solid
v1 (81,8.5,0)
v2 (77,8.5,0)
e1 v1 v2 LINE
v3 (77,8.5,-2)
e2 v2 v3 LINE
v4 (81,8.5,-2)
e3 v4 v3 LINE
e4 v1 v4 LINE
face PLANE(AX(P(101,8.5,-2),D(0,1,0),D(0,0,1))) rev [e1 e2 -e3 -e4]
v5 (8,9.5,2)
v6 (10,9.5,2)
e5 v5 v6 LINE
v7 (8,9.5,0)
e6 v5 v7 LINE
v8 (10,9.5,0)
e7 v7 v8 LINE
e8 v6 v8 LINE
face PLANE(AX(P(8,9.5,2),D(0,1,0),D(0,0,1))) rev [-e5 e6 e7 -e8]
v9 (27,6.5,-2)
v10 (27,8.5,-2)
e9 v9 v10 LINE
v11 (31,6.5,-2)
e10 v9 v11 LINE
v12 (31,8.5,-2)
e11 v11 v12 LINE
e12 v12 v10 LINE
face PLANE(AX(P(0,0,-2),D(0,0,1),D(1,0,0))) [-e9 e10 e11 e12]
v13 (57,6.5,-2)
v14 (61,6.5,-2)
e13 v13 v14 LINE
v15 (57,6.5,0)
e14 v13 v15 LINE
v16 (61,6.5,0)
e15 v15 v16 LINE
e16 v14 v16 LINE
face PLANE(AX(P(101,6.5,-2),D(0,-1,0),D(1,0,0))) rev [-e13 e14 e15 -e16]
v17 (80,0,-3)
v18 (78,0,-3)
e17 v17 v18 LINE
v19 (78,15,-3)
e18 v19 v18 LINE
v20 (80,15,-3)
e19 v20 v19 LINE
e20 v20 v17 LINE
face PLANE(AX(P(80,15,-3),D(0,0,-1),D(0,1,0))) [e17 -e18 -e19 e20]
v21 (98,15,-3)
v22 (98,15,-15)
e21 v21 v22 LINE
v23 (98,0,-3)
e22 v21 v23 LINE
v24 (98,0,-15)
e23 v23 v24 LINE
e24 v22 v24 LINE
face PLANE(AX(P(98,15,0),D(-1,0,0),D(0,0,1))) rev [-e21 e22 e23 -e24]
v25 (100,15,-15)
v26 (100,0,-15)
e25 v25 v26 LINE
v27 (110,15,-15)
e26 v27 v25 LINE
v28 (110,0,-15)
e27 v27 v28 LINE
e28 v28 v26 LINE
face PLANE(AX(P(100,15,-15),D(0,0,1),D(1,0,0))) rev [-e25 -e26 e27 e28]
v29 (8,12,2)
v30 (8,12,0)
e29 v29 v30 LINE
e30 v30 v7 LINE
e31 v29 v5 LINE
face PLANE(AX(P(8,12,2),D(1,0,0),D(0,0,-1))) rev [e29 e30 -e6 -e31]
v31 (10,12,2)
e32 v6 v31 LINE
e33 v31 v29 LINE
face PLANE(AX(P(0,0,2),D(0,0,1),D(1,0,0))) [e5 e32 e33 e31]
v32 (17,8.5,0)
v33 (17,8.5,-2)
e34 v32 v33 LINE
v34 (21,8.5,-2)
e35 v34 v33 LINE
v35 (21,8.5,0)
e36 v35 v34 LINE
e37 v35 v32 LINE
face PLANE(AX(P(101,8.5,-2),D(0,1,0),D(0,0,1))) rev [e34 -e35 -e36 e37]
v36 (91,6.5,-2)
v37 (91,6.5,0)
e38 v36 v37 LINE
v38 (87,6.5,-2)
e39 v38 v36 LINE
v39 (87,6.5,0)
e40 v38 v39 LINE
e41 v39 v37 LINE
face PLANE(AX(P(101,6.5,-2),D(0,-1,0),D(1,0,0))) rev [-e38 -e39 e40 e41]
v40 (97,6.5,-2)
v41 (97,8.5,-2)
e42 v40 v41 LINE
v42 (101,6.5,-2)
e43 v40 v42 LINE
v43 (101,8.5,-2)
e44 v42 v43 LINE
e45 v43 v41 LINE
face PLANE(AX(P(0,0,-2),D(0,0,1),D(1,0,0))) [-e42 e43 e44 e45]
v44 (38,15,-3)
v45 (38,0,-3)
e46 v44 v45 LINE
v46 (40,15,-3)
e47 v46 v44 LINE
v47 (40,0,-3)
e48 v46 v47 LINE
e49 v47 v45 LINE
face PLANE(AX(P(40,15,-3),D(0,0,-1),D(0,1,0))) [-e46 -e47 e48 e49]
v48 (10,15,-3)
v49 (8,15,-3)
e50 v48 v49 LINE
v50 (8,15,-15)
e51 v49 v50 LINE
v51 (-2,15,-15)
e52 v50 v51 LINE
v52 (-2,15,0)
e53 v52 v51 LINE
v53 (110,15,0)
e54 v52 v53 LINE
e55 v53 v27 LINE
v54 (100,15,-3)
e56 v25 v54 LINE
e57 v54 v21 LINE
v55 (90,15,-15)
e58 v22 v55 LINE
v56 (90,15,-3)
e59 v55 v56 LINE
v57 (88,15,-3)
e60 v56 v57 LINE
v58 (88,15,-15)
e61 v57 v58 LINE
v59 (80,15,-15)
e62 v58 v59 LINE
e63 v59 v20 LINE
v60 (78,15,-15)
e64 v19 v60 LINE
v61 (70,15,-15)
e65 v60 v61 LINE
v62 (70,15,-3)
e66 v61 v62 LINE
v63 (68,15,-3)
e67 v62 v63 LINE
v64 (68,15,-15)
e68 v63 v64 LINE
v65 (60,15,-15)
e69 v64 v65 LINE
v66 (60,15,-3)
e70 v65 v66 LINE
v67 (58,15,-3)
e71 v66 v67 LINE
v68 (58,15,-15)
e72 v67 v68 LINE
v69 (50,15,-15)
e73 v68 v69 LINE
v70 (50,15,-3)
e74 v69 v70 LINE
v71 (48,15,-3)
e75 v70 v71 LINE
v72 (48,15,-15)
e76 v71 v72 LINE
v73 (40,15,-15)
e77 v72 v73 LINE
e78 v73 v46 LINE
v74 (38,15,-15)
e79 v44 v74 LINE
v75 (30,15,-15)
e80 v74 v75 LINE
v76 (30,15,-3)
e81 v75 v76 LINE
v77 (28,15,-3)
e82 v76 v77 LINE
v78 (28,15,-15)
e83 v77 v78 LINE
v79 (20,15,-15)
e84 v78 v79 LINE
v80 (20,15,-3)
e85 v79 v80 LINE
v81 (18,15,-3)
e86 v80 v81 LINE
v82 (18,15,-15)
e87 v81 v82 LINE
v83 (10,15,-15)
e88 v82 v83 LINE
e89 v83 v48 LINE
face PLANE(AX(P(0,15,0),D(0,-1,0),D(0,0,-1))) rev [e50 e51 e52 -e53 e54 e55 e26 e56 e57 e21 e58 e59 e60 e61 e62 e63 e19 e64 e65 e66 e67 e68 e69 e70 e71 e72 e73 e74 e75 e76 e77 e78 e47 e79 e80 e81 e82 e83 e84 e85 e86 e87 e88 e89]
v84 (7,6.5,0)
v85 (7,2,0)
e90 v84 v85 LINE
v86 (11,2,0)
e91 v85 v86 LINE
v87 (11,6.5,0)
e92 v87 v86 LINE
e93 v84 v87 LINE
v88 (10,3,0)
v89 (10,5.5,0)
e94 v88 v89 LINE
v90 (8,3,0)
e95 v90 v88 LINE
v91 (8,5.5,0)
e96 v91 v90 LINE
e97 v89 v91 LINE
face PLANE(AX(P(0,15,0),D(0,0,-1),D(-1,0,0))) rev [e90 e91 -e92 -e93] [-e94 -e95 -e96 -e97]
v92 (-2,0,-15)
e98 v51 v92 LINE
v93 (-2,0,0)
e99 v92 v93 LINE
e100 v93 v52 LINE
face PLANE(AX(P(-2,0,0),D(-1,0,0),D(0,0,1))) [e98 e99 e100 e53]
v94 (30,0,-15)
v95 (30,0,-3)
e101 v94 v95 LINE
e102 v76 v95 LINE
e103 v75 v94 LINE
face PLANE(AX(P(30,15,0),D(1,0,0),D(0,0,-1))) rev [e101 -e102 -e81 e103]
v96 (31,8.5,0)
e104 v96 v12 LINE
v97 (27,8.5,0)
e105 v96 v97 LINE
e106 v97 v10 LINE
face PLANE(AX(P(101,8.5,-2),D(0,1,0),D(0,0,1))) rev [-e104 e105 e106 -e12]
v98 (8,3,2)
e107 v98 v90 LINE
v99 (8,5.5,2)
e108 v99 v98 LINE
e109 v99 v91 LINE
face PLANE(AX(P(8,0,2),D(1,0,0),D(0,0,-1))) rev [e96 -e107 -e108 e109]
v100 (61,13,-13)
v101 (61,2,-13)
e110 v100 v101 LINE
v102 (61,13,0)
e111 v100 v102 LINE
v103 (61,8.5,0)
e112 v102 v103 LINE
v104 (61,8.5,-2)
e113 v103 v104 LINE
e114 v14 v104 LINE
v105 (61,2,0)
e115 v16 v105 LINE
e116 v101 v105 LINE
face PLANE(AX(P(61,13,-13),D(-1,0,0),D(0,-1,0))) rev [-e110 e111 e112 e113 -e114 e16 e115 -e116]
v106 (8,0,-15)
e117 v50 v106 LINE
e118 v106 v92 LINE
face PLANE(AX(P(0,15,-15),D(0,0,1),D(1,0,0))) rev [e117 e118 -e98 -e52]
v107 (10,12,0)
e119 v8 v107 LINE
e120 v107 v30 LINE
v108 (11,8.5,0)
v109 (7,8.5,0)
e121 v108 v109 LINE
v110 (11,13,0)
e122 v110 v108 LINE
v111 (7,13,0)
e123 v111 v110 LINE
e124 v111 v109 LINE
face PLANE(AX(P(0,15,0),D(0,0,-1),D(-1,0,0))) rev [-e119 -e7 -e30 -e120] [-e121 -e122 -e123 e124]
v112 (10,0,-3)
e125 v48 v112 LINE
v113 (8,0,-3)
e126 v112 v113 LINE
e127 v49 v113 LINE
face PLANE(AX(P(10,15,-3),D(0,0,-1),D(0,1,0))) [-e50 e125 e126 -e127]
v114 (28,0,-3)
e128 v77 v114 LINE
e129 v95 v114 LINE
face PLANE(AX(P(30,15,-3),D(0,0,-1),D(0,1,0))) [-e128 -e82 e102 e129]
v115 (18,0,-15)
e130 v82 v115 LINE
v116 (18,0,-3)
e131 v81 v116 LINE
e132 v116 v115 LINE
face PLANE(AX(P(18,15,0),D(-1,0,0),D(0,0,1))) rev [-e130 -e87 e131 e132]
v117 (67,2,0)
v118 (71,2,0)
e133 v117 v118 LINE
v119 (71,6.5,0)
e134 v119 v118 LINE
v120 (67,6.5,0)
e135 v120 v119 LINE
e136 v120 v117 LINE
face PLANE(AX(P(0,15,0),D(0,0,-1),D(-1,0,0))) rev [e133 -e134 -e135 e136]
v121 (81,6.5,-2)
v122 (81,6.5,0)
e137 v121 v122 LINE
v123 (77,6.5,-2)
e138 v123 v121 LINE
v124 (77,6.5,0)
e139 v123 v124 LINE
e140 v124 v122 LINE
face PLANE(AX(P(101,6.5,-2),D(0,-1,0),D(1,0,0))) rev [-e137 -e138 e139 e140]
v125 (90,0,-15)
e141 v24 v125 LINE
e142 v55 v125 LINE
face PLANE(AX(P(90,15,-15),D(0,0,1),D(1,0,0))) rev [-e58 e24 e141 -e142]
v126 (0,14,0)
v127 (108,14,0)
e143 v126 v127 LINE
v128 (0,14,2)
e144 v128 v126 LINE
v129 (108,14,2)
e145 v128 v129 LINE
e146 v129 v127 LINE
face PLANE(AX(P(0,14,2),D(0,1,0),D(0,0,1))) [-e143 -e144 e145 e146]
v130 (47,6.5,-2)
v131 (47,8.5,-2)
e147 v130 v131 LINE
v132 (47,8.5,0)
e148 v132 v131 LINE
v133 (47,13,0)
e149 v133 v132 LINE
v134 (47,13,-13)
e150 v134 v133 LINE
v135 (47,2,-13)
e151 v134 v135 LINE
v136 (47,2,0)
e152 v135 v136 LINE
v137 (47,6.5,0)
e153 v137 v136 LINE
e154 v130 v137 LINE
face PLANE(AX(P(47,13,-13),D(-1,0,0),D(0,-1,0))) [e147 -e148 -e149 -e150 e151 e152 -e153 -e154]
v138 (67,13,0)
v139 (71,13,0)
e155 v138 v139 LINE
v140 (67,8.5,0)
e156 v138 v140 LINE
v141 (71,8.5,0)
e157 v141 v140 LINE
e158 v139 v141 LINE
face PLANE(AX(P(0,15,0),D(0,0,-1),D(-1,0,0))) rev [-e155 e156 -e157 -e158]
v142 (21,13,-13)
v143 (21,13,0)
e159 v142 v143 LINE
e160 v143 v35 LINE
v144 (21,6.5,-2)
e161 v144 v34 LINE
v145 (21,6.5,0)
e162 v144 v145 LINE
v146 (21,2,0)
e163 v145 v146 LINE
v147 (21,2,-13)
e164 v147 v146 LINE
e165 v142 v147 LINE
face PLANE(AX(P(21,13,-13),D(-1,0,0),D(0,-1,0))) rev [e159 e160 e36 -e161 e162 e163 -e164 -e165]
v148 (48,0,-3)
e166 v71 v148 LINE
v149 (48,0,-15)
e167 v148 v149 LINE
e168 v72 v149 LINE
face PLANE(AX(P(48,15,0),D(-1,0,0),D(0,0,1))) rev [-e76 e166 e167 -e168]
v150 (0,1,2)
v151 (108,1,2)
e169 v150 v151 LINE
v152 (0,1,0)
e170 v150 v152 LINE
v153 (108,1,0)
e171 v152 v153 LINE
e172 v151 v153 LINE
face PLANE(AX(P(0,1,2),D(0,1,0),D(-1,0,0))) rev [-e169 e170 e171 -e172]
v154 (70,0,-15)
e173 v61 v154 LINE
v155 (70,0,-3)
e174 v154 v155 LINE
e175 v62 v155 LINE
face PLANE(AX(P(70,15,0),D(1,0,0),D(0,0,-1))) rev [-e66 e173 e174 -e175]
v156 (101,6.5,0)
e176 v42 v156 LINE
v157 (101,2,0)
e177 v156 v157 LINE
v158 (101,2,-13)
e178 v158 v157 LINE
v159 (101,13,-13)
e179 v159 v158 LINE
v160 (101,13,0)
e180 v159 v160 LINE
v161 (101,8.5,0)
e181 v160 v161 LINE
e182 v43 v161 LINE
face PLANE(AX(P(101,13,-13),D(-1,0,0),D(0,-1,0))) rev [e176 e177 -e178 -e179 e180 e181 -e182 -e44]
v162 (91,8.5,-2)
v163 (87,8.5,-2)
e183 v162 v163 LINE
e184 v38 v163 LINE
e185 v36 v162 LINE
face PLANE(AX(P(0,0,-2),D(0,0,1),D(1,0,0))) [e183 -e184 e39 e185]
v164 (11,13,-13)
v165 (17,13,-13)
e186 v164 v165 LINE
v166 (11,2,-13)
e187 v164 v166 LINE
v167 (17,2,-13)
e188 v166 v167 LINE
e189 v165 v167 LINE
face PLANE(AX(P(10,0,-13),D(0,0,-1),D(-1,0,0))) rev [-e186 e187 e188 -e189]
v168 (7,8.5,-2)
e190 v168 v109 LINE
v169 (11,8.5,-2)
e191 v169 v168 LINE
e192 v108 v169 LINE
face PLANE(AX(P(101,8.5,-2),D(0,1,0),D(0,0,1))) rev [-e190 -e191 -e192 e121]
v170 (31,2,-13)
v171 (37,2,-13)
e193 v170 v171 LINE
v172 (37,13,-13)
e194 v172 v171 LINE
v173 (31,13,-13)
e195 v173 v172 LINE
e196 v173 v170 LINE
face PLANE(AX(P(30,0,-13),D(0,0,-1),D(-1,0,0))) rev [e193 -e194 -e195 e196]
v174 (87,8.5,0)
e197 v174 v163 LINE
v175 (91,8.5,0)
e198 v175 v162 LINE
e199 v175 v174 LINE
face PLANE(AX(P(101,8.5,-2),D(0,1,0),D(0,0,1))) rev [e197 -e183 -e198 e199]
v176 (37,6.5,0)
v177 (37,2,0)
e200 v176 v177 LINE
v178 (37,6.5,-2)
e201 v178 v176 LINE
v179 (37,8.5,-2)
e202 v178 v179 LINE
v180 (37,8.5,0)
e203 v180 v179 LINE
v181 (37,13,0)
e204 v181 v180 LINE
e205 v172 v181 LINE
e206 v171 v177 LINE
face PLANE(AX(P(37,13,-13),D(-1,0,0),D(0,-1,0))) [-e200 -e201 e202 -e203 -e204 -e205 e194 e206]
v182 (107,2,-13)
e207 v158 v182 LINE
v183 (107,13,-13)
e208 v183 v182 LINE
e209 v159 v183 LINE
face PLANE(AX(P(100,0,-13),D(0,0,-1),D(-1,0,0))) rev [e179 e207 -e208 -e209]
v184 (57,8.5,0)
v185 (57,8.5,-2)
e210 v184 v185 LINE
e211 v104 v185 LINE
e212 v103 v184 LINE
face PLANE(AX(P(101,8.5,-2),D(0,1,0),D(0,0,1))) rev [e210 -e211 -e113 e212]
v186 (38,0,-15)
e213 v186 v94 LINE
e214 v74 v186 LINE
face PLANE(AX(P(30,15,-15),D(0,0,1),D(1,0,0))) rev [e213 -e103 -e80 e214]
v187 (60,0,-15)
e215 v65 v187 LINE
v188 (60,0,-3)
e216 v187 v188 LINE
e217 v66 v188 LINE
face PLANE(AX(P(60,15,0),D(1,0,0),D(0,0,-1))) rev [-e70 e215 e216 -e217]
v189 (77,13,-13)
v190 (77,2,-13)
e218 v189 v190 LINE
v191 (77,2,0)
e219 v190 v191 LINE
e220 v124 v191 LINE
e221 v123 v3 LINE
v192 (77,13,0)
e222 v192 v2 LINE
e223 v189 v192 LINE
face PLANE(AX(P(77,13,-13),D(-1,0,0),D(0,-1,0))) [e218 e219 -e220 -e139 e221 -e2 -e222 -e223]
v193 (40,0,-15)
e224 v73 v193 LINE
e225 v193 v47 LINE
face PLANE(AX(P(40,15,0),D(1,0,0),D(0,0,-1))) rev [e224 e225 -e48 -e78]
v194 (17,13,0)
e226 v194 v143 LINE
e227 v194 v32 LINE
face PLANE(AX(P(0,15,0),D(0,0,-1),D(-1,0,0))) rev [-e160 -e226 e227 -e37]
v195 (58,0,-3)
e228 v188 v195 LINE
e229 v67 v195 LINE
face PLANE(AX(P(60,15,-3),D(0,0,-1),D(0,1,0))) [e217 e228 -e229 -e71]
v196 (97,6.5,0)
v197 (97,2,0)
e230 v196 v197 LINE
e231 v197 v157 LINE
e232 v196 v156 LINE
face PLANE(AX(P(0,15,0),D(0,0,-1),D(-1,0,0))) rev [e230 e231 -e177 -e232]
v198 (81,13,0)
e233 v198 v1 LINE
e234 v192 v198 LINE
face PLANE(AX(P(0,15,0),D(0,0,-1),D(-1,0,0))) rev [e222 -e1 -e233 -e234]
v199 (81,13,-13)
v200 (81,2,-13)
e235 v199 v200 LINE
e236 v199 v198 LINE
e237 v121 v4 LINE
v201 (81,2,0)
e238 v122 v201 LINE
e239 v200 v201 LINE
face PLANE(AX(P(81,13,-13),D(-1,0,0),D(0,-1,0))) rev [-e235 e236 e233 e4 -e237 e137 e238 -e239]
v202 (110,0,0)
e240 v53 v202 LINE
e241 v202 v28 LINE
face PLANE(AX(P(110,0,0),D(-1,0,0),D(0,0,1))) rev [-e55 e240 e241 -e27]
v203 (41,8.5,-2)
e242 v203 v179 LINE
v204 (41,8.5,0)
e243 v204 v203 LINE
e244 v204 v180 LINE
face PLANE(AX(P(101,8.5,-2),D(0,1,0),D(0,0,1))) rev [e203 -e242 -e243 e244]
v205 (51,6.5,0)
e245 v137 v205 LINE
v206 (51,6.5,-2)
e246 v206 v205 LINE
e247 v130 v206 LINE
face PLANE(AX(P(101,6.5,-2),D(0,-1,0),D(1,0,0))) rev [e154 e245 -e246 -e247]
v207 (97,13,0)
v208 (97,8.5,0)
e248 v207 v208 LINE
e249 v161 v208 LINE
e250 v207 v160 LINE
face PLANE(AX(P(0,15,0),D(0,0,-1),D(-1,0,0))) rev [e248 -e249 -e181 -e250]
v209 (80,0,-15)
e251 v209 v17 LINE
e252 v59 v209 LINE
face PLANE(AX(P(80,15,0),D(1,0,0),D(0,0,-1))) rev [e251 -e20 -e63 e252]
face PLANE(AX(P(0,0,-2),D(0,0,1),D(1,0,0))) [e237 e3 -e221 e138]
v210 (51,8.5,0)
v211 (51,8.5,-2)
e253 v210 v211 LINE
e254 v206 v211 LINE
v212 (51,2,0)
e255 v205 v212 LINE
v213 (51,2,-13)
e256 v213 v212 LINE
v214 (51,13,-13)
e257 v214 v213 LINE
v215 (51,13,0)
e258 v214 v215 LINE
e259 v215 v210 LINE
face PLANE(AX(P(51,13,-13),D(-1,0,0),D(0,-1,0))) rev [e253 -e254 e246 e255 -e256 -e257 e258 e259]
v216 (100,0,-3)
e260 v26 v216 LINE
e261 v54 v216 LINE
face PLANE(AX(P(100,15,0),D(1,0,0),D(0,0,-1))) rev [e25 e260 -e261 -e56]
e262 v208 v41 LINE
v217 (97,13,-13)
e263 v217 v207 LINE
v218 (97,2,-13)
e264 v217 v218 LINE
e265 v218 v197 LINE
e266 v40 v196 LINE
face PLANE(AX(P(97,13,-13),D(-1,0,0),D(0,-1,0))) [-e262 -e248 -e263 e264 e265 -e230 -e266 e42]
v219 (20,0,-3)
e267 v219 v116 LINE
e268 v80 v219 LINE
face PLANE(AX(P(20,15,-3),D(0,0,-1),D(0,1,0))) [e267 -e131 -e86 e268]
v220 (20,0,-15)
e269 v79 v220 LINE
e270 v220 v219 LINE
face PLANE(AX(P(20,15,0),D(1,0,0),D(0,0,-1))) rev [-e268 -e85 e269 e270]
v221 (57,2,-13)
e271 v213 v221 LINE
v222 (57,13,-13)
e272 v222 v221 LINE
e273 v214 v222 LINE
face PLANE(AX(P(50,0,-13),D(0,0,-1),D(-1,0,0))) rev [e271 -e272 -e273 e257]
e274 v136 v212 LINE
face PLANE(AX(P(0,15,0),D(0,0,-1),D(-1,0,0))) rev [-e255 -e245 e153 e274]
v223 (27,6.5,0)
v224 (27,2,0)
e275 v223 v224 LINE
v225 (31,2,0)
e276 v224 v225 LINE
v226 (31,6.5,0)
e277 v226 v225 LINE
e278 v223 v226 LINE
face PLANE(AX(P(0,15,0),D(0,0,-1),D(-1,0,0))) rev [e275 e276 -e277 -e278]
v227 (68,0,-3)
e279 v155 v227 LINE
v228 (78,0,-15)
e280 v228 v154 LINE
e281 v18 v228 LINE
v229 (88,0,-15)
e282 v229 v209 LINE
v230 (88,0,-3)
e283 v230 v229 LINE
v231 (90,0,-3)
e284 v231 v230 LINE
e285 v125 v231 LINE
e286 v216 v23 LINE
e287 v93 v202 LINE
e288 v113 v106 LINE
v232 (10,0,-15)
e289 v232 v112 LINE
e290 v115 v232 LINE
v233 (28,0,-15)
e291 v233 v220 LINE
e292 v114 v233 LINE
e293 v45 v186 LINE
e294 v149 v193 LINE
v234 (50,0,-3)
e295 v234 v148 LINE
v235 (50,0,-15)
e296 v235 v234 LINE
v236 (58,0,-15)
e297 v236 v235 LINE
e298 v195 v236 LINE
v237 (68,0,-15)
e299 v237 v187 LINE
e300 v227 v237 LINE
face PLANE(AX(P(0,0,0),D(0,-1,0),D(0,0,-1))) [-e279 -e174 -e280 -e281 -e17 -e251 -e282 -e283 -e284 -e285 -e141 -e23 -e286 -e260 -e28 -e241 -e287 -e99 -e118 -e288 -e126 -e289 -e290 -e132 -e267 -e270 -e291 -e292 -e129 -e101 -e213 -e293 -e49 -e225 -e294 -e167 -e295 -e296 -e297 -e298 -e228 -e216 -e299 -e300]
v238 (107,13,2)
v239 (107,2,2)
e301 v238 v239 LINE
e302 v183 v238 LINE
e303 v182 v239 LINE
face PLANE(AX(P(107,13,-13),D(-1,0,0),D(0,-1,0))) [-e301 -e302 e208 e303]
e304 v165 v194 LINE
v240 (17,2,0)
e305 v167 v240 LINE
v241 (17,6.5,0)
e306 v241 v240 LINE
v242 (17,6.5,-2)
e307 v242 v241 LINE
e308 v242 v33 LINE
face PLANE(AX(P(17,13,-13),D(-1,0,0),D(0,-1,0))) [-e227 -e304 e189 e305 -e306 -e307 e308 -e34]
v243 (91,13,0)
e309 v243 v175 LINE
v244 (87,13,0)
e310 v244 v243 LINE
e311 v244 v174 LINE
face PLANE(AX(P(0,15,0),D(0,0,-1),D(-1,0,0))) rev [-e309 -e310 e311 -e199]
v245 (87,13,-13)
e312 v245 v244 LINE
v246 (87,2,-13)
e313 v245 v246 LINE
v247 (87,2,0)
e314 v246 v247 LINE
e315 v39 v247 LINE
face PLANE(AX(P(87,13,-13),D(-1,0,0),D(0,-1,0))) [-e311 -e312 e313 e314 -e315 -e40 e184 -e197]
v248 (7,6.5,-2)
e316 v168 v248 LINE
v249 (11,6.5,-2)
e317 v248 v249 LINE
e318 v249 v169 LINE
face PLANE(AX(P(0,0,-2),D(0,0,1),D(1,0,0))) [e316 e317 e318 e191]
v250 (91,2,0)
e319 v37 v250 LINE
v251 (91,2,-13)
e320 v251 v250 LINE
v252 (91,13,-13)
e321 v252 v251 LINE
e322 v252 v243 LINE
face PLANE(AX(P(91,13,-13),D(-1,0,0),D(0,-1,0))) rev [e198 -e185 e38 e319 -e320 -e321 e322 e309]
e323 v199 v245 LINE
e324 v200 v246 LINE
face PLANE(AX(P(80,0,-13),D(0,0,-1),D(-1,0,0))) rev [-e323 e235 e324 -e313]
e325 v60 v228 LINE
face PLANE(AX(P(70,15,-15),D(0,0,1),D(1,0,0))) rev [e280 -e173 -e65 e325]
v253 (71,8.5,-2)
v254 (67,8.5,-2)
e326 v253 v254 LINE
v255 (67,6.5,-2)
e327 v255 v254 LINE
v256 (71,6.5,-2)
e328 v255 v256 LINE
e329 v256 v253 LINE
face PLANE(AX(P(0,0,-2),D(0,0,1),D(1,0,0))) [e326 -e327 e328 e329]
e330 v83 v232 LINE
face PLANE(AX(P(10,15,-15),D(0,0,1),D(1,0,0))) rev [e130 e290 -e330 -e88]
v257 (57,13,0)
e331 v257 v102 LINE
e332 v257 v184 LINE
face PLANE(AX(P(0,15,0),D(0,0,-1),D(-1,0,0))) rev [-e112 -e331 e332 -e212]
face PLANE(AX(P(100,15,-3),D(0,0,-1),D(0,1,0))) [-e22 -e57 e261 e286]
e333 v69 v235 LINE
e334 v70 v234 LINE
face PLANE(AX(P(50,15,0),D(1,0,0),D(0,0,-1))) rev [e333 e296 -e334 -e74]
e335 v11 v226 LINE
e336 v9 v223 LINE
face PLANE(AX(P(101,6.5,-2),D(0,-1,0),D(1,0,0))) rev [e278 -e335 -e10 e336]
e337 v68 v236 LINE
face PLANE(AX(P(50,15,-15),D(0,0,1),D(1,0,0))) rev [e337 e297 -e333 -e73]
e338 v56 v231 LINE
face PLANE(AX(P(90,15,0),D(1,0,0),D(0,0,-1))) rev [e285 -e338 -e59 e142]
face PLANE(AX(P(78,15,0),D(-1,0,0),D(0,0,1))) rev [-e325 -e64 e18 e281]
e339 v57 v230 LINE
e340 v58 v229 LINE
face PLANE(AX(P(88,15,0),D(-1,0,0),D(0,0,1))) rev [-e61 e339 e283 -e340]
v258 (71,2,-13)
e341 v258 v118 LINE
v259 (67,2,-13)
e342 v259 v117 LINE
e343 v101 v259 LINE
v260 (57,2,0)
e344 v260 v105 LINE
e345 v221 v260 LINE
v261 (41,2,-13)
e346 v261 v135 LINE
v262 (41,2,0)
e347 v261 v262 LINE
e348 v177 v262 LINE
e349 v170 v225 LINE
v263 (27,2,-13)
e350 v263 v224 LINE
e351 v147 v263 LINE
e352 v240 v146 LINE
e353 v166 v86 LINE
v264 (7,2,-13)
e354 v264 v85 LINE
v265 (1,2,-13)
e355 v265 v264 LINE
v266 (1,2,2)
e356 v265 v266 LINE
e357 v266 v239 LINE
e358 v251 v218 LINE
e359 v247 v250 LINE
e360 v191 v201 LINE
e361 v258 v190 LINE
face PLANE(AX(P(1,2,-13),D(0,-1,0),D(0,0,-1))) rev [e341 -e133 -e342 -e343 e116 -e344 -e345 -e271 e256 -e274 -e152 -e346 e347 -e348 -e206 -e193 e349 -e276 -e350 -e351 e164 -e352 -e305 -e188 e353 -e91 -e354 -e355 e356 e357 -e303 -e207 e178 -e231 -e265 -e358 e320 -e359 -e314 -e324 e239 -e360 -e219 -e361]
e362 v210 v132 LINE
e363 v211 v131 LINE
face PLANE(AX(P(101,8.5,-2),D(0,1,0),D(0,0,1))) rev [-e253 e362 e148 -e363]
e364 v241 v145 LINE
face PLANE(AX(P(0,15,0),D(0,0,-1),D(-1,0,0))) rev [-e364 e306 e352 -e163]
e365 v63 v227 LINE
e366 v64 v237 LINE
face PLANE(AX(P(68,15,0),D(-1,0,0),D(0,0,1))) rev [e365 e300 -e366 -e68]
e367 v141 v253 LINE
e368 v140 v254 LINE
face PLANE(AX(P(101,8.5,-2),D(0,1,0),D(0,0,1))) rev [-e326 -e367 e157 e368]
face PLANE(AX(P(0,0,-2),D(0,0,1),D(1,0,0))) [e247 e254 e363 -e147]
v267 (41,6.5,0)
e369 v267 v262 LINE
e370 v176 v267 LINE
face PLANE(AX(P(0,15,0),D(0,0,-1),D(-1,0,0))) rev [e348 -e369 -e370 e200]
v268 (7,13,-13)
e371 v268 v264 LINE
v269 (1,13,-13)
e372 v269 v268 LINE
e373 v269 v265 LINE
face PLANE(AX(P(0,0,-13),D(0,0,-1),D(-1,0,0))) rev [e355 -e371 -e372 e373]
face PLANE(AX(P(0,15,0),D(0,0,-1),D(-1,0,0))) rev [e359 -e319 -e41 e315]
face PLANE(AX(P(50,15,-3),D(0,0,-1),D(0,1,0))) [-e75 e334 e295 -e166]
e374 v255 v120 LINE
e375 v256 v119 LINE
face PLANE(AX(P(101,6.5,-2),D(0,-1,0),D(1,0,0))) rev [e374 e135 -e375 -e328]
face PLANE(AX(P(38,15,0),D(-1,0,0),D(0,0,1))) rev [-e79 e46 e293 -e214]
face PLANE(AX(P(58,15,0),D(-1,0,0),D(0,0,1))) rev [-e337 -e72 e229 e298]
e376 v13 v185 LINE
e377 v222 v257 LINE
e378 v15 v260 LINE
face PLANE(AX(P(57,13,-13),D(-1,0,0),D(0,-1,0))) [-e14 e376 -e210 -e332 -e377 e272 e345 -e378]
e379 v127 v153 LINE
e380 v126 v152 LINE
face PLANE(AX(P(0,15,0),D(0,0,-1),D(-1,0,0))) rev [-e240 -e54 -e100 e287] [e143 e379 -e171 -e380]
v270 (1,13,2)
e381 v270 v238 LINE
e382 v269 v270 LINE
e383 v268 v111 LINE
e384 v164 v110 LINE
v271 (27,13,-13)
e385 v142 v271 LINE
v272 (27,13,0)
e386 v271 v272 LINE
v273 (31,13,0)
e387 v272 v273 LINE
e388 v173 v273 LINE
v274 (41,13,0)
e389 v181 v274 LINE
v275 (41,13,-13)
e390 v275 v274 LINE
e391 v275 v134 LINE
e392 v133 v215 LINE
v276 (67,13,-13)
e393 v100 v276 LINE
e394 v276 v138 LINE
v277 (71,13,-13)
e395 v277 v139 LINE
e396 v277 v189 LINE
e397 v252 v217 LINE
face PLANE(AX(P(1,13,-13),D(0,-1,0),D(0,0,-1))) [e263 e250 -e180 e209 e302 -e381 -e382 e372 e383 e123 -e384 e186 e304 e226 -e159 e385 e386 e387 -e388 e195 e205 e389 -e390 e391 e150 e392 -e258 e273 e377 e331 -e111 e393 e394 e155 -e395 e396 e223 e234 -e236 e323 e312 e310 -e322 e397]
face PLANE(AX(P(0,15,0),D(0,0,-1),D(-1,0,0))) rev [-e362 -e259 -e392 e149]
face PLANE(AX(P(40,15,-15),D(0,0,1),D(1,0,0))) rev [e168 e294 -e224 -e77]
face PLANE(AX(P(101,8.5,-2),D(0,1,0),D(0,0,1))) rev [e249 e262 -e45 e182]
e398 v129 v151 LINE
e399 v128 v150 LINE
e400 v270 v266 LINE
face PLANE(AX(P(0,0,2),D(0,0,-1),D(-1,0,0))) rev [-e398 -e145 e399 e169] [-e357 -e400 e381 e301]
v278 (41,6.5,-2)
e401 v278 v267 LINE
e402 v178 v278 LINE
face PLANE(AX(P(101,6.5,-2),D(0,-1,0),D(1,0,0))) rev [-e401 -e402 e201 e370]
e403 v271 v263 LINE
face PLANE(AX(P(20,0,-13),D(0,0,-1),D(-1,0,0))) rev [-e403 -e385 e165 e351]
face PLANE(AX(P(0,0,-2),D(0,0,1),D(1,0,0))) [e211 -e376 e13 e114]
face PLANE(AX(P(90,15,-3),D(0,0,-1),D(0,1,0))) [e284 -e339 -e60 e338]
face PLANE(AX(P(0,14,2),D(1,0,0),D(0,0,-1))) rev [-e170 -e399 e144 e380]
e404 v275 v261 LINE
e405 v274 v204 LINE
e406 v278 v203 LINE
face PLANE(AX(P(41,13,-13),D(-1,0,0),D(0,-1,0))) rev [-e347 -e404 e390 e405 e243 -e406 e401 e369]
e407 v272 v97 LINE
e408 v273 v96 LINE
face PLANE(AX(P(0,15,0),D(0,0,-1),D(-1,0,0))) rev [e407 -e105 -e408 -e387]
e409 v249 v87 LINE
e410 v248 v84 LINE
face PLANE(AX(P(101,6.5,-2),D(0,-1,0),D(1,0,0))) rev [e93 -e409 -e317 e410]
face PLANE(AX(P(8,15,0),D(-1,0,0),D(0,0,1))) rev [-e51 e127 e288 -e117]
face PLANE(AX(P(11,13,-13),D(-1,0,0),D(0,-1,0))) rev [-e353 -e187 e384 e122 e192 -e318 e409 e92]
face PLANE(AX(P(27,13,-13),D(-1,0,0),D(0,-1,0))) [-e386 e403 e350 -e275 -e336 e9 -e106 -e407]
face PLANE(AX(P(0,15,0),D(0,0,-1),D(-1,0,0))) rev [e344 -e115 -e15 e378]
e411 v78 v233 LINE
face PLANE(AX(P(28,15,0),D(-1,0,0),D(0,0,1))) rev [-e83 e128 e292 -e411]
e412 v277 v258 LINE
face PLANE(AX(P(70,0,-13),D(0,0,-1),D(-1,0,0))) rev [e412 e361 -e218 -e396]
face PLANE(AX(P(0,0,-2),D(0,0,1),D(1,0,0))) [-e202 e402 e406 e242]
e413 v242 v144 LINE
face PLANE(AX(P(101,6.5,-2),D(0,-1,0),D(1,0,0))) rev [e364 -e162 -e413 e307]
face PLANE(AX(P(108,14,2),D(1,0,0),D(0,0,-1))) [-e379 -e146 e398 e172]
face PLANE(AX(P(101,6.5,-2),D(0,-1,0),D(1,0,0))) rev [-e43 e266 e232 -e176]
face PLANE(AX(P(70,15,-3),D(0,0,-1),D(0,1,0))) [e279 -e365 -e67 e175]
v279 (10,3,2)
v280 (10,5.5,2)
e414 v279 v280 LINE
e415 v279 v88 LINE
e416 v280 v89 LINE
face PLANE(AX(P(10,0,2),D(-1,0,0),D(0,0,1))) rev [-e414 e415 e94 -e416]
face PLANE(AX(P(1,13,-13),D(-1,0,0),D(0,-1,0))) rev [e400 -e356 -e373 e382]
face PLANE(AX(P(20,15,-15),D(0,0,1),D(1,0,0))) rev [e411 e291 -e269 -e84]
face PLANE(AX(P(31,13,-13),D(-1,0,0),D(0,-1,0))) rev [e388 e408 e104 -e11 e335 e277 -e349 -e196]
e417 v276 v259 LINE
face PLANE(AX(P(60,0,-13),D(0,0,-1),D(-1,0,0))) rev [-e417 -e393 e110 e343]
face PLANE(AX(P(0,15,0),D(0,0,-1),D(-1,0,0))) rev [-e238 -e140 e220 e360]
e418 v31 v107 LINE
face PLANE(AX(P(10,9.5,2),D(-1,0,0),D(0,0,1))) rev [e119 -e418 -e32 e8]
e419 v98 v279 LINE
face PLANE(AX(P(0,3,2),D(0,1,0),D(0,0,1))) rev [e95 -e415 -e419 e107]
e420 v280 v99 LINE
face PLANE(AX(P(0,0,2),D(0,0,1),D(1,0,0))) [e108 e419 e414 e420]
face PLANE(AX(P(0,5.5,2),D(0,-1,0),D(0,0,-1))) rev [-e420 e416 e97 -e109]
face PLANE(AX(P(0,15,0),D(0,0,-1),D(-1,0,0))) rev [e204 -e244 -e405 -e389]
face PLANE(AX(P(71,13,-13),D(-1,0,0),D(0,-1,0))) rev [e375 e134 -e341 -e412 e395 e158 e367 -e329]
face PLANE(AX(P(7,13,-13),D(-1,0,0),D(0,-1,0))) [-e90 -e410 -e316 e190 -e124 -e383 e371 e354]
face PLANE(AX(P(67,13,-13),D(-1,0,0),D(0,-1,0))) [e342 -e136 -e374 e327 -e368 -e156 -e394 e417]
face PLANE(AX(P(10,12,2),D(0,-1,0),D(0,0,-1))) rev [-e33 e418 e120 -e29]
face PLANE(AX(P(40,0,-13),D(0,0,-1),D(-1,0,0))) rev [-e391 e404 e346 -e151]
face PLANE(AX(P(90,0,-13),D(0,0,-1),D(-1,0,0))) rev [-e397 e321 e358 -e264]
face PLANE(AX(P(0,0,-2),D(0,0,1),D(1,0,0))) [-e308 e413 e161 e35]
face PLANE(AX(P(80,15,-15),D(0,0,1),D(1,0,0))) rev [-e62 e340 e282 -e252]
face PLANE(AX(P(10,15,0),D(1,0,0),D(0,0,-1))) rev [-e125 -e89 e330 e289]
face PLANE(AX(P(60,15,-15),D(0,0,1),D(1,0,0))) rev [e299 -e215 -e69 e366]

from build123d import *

# Parameters (mm, degrees)
EXTRUDE_1_OUTLINE_W    = 15
EXTRUDE_1_OUTLINE_H    = 15
EXTRUDE_1_DEPTH        = 8
SKETCH_2_W             = 6
SKETCH_2_H             = 11
CUT_EXTRUDE_1_DEPTH    = 13
SKETCH_3_W             = 3
SKETCH_3_H             = 15
EXTRUDE_2_DEPTH        = 2
PATTERN_LINEAR_2_COUNT = 11
PATTERN_LINEAR_2_PITCH = 10
SKETCH_5_W             = 12
SKETCH_5_H             = 15
EXTRUDE_3_DEPTH        = 2
SKETCH_6_W             = 15
SKETCH_6_H             = 15
EXTRUDE_4_DEPTH        = 2
SKETCH_7_W             = 94
SKETCH_7_H             = 2
CUT_EXTRUDE_2_DEPTH    = 2
SKETCH_9_W             = 108
SKETCH_9_H             = 13
SKETCH_9_W_2           = 106
SKETCH_9_H_2           = 11
EXTRUDE_5_DEPTH        = 2
SKETCH_10_W            = 2
SKETCH_10_H            = 2.5
EXTRUDE_6_DEPTH        = 2


# Read off the part's stored shape, not the designer's step: 凸台-拉伸1
with BuildPart() as part:
    # 凸台-拉伸1 outline → 凸台-拉伸1 (new body)
    with BuildSketch(Plane.YZ):
        with Locations((7.5, -7.5)):
            Rectangle(EXTRUDE_1_OUTLINE_W, EXTRUDE_1_OUTLINE_H)
    extrude(amount=EXTRUDE_1_DEPTH)

    # 草图2 → 切除-拉伸1 (cut)
    with BuildSketch(Plane.XY):
        with Locations((4, 7.5)):
            Rectangle(SKETCH_2_W, SKETCH_2_H)
    extrude(amount=-CUT_EXTRUDE_1_DEPTH, mode=Mode.SUBTRACT)

    # 草图3 → 凸台-拉伸2 (add)
    with BuildSketch(Plane(origin=(8, 0, 0), x_dir=(0, 0, -1), z_dir=(1, 0, 0))):
        with Locations((1.5, 7.5)):
            Rectangle(SKETCH_3_W, SKETCH_3_H)
    extrude(amount=EXTRUDE_2_DEPTH)


with BuildPart() as pattern_linear_2_1:
    # 阵列(线性)2: pattern copy
    add(part.part.moved(Location(Vector(1, 0, 0) * (1 * PATTERN_LINEAR_2_PITCH))))


with BuildPart() as pattern_linear_2_2:
    # 阵列(线性)2: pattern copy
    add(part.part.moved(Location(Vector(1, 0, 0) * (2 * PATTERN_LINEAR_2_PITCH))))


with BuildPart() as pattern_linear_2_3:
    # 阵列(线性)2: pattern copy
    add(part.part.moved(Location(Vector(1, 0, 0) * (3 * PATTERN_LINEAR_2_PITCH))))


with BuildPart() as pattern_linear_2_4:
    # 阵列(线性)2: pattern copy
    add(part.part.moved(Location(Vector(1, 0, 0) * (4 * PATTERN_LINEAR_2_PITCH))))


with BuildPart() as pattern_linear_2_5:
    # 阵列(线性)2: pattern copy
    add(part.part.moved(Location(Vector(1, 0, 0) * (5 * PATTERN_LINEAR_2_PITCH))))


with BuildPart() as pattern_linear_2_6:
    # 阵列(线性)2: pattern copy
    add(part.part.moved(Location(Vector(1, 0, 0) * (6 * PATTERN_LINEAR_2_PITCH))))


with BuildPart() as pattern_linear_2_7:
    # 阵列(线性)2: pattern copy
    add(part.part.moved(Location(Vector(1, 0, 0) * (7 * PATTERN_LINEAR_2_PITCH))))


with BuildPart() as pattern_linear_2_8:
    # 阵列(线性)2: pattern copy
    add(part.part.moved(Location(Vector(1, 0, 0) * (8 * PATTERN_LINEAR_2_PITCH))))


with BuildPart() as pattern_linear_2_9:
    # 阵列(线性)2: pattern copy
    add(part.part.moved(Location(Vector(1, 0, 0) * (9 * PATTERN_LINEAR_2_PITCH))))


with BuildPart() as pattern_linear_2_10:
    # 阵列(线性)2: pattern copy
    add(part.part.moved(Location(Vector(1, 0, 0) * (10 * PATTERN_LINEAR_2_PITCH))))


with BuildPart() as part_1:
    add(part.part)

    # Combine 2: union 阵列(线性)2_1, 阵列(线性)2_2, 阵列(线性)2_3, 阵列(线性)2_4, 阵列(线性)2_5, 阵列(线性)2_6, 阵列(线性)2_7, 阵列(线性)2_8, 阵列(线性)2_9, 阵列(线性)2_10
    add(pattern_linear_2_1.part)
    add(pattern_linear_2_2.part)
    add(pattern_linear_2_3.part)
    add(pattern_linear_2_4.part)
    add(pattern_linear_2_5.part)
    add(pattern_linear_2_6.part)
    add(pattern_linear_2_7.part)
    add(pattern_linear_2_8.part)
    add(pattern_linear_2_9.part)
    add(pattern_linear_2_10.part)

    # 草图5 → 凸台-拉伸3 (add)
    with BuildSketch(Plane(origin=(108, 0, 0), x_dir=(0, 0, -1), z_dir=(1, 0, 0))):
        with Locations((9, 7.5)):
            Rectangle(SKETCH_5_W, SKETCH_5_H)
    extrude(amount=EXTRUDE_3_DEPTH)

    # 草图6 → 凸台-拉伸4 (add)
    with BuildSketch(Plane.ZY):
        with Locations((-7.5, 7.5)):
            Rectangle(SKETCH_6_W, SKETCH_6_H)
    extrude(amount=EXTRUDE_4_DEPTH)

    # 草图7 → 切除-拉伸2 (cut)
    with BuildSketch(Plane.XY):
        with Locations((54, 7.5)):
            Rectangle(SKETCH_7_W, SKETCH_7_H)
    extrude(amount=-CUT_EXTRUDE_2_DEPTH, mode=Mode.SUBTRACT)

    # 草图9 → 凸台-拉伸5 (add)
    with BuildSketch(Plane.XY):
        with Locations((54, 7.5)):
            Rectangle(SKETCH_9_W, SKETCH_9_H)
        with Locations((54, 7.5)):
            Rectangle(SKETCH_9_W_2, SKETCH_9_H_2, mode=Mode.SUBTRACT)
    extrude(amount=EXTRUDE_5_DEPTH)

    # 草图10 → 凸台-拉伸6 (add)
    with BuildSketch(Plane.XY):
        with Locations((9, 4.25)):
            Rectangle(SKETCH_10_W, SKETCH_10_H)
        with Locations((9, 10.75)):
            Rectangle(SKETCH_10_W, SKETCH_10_H)
    extrude(amount=EXTRUDE_6_DEPTH)


solid = part_1.part
